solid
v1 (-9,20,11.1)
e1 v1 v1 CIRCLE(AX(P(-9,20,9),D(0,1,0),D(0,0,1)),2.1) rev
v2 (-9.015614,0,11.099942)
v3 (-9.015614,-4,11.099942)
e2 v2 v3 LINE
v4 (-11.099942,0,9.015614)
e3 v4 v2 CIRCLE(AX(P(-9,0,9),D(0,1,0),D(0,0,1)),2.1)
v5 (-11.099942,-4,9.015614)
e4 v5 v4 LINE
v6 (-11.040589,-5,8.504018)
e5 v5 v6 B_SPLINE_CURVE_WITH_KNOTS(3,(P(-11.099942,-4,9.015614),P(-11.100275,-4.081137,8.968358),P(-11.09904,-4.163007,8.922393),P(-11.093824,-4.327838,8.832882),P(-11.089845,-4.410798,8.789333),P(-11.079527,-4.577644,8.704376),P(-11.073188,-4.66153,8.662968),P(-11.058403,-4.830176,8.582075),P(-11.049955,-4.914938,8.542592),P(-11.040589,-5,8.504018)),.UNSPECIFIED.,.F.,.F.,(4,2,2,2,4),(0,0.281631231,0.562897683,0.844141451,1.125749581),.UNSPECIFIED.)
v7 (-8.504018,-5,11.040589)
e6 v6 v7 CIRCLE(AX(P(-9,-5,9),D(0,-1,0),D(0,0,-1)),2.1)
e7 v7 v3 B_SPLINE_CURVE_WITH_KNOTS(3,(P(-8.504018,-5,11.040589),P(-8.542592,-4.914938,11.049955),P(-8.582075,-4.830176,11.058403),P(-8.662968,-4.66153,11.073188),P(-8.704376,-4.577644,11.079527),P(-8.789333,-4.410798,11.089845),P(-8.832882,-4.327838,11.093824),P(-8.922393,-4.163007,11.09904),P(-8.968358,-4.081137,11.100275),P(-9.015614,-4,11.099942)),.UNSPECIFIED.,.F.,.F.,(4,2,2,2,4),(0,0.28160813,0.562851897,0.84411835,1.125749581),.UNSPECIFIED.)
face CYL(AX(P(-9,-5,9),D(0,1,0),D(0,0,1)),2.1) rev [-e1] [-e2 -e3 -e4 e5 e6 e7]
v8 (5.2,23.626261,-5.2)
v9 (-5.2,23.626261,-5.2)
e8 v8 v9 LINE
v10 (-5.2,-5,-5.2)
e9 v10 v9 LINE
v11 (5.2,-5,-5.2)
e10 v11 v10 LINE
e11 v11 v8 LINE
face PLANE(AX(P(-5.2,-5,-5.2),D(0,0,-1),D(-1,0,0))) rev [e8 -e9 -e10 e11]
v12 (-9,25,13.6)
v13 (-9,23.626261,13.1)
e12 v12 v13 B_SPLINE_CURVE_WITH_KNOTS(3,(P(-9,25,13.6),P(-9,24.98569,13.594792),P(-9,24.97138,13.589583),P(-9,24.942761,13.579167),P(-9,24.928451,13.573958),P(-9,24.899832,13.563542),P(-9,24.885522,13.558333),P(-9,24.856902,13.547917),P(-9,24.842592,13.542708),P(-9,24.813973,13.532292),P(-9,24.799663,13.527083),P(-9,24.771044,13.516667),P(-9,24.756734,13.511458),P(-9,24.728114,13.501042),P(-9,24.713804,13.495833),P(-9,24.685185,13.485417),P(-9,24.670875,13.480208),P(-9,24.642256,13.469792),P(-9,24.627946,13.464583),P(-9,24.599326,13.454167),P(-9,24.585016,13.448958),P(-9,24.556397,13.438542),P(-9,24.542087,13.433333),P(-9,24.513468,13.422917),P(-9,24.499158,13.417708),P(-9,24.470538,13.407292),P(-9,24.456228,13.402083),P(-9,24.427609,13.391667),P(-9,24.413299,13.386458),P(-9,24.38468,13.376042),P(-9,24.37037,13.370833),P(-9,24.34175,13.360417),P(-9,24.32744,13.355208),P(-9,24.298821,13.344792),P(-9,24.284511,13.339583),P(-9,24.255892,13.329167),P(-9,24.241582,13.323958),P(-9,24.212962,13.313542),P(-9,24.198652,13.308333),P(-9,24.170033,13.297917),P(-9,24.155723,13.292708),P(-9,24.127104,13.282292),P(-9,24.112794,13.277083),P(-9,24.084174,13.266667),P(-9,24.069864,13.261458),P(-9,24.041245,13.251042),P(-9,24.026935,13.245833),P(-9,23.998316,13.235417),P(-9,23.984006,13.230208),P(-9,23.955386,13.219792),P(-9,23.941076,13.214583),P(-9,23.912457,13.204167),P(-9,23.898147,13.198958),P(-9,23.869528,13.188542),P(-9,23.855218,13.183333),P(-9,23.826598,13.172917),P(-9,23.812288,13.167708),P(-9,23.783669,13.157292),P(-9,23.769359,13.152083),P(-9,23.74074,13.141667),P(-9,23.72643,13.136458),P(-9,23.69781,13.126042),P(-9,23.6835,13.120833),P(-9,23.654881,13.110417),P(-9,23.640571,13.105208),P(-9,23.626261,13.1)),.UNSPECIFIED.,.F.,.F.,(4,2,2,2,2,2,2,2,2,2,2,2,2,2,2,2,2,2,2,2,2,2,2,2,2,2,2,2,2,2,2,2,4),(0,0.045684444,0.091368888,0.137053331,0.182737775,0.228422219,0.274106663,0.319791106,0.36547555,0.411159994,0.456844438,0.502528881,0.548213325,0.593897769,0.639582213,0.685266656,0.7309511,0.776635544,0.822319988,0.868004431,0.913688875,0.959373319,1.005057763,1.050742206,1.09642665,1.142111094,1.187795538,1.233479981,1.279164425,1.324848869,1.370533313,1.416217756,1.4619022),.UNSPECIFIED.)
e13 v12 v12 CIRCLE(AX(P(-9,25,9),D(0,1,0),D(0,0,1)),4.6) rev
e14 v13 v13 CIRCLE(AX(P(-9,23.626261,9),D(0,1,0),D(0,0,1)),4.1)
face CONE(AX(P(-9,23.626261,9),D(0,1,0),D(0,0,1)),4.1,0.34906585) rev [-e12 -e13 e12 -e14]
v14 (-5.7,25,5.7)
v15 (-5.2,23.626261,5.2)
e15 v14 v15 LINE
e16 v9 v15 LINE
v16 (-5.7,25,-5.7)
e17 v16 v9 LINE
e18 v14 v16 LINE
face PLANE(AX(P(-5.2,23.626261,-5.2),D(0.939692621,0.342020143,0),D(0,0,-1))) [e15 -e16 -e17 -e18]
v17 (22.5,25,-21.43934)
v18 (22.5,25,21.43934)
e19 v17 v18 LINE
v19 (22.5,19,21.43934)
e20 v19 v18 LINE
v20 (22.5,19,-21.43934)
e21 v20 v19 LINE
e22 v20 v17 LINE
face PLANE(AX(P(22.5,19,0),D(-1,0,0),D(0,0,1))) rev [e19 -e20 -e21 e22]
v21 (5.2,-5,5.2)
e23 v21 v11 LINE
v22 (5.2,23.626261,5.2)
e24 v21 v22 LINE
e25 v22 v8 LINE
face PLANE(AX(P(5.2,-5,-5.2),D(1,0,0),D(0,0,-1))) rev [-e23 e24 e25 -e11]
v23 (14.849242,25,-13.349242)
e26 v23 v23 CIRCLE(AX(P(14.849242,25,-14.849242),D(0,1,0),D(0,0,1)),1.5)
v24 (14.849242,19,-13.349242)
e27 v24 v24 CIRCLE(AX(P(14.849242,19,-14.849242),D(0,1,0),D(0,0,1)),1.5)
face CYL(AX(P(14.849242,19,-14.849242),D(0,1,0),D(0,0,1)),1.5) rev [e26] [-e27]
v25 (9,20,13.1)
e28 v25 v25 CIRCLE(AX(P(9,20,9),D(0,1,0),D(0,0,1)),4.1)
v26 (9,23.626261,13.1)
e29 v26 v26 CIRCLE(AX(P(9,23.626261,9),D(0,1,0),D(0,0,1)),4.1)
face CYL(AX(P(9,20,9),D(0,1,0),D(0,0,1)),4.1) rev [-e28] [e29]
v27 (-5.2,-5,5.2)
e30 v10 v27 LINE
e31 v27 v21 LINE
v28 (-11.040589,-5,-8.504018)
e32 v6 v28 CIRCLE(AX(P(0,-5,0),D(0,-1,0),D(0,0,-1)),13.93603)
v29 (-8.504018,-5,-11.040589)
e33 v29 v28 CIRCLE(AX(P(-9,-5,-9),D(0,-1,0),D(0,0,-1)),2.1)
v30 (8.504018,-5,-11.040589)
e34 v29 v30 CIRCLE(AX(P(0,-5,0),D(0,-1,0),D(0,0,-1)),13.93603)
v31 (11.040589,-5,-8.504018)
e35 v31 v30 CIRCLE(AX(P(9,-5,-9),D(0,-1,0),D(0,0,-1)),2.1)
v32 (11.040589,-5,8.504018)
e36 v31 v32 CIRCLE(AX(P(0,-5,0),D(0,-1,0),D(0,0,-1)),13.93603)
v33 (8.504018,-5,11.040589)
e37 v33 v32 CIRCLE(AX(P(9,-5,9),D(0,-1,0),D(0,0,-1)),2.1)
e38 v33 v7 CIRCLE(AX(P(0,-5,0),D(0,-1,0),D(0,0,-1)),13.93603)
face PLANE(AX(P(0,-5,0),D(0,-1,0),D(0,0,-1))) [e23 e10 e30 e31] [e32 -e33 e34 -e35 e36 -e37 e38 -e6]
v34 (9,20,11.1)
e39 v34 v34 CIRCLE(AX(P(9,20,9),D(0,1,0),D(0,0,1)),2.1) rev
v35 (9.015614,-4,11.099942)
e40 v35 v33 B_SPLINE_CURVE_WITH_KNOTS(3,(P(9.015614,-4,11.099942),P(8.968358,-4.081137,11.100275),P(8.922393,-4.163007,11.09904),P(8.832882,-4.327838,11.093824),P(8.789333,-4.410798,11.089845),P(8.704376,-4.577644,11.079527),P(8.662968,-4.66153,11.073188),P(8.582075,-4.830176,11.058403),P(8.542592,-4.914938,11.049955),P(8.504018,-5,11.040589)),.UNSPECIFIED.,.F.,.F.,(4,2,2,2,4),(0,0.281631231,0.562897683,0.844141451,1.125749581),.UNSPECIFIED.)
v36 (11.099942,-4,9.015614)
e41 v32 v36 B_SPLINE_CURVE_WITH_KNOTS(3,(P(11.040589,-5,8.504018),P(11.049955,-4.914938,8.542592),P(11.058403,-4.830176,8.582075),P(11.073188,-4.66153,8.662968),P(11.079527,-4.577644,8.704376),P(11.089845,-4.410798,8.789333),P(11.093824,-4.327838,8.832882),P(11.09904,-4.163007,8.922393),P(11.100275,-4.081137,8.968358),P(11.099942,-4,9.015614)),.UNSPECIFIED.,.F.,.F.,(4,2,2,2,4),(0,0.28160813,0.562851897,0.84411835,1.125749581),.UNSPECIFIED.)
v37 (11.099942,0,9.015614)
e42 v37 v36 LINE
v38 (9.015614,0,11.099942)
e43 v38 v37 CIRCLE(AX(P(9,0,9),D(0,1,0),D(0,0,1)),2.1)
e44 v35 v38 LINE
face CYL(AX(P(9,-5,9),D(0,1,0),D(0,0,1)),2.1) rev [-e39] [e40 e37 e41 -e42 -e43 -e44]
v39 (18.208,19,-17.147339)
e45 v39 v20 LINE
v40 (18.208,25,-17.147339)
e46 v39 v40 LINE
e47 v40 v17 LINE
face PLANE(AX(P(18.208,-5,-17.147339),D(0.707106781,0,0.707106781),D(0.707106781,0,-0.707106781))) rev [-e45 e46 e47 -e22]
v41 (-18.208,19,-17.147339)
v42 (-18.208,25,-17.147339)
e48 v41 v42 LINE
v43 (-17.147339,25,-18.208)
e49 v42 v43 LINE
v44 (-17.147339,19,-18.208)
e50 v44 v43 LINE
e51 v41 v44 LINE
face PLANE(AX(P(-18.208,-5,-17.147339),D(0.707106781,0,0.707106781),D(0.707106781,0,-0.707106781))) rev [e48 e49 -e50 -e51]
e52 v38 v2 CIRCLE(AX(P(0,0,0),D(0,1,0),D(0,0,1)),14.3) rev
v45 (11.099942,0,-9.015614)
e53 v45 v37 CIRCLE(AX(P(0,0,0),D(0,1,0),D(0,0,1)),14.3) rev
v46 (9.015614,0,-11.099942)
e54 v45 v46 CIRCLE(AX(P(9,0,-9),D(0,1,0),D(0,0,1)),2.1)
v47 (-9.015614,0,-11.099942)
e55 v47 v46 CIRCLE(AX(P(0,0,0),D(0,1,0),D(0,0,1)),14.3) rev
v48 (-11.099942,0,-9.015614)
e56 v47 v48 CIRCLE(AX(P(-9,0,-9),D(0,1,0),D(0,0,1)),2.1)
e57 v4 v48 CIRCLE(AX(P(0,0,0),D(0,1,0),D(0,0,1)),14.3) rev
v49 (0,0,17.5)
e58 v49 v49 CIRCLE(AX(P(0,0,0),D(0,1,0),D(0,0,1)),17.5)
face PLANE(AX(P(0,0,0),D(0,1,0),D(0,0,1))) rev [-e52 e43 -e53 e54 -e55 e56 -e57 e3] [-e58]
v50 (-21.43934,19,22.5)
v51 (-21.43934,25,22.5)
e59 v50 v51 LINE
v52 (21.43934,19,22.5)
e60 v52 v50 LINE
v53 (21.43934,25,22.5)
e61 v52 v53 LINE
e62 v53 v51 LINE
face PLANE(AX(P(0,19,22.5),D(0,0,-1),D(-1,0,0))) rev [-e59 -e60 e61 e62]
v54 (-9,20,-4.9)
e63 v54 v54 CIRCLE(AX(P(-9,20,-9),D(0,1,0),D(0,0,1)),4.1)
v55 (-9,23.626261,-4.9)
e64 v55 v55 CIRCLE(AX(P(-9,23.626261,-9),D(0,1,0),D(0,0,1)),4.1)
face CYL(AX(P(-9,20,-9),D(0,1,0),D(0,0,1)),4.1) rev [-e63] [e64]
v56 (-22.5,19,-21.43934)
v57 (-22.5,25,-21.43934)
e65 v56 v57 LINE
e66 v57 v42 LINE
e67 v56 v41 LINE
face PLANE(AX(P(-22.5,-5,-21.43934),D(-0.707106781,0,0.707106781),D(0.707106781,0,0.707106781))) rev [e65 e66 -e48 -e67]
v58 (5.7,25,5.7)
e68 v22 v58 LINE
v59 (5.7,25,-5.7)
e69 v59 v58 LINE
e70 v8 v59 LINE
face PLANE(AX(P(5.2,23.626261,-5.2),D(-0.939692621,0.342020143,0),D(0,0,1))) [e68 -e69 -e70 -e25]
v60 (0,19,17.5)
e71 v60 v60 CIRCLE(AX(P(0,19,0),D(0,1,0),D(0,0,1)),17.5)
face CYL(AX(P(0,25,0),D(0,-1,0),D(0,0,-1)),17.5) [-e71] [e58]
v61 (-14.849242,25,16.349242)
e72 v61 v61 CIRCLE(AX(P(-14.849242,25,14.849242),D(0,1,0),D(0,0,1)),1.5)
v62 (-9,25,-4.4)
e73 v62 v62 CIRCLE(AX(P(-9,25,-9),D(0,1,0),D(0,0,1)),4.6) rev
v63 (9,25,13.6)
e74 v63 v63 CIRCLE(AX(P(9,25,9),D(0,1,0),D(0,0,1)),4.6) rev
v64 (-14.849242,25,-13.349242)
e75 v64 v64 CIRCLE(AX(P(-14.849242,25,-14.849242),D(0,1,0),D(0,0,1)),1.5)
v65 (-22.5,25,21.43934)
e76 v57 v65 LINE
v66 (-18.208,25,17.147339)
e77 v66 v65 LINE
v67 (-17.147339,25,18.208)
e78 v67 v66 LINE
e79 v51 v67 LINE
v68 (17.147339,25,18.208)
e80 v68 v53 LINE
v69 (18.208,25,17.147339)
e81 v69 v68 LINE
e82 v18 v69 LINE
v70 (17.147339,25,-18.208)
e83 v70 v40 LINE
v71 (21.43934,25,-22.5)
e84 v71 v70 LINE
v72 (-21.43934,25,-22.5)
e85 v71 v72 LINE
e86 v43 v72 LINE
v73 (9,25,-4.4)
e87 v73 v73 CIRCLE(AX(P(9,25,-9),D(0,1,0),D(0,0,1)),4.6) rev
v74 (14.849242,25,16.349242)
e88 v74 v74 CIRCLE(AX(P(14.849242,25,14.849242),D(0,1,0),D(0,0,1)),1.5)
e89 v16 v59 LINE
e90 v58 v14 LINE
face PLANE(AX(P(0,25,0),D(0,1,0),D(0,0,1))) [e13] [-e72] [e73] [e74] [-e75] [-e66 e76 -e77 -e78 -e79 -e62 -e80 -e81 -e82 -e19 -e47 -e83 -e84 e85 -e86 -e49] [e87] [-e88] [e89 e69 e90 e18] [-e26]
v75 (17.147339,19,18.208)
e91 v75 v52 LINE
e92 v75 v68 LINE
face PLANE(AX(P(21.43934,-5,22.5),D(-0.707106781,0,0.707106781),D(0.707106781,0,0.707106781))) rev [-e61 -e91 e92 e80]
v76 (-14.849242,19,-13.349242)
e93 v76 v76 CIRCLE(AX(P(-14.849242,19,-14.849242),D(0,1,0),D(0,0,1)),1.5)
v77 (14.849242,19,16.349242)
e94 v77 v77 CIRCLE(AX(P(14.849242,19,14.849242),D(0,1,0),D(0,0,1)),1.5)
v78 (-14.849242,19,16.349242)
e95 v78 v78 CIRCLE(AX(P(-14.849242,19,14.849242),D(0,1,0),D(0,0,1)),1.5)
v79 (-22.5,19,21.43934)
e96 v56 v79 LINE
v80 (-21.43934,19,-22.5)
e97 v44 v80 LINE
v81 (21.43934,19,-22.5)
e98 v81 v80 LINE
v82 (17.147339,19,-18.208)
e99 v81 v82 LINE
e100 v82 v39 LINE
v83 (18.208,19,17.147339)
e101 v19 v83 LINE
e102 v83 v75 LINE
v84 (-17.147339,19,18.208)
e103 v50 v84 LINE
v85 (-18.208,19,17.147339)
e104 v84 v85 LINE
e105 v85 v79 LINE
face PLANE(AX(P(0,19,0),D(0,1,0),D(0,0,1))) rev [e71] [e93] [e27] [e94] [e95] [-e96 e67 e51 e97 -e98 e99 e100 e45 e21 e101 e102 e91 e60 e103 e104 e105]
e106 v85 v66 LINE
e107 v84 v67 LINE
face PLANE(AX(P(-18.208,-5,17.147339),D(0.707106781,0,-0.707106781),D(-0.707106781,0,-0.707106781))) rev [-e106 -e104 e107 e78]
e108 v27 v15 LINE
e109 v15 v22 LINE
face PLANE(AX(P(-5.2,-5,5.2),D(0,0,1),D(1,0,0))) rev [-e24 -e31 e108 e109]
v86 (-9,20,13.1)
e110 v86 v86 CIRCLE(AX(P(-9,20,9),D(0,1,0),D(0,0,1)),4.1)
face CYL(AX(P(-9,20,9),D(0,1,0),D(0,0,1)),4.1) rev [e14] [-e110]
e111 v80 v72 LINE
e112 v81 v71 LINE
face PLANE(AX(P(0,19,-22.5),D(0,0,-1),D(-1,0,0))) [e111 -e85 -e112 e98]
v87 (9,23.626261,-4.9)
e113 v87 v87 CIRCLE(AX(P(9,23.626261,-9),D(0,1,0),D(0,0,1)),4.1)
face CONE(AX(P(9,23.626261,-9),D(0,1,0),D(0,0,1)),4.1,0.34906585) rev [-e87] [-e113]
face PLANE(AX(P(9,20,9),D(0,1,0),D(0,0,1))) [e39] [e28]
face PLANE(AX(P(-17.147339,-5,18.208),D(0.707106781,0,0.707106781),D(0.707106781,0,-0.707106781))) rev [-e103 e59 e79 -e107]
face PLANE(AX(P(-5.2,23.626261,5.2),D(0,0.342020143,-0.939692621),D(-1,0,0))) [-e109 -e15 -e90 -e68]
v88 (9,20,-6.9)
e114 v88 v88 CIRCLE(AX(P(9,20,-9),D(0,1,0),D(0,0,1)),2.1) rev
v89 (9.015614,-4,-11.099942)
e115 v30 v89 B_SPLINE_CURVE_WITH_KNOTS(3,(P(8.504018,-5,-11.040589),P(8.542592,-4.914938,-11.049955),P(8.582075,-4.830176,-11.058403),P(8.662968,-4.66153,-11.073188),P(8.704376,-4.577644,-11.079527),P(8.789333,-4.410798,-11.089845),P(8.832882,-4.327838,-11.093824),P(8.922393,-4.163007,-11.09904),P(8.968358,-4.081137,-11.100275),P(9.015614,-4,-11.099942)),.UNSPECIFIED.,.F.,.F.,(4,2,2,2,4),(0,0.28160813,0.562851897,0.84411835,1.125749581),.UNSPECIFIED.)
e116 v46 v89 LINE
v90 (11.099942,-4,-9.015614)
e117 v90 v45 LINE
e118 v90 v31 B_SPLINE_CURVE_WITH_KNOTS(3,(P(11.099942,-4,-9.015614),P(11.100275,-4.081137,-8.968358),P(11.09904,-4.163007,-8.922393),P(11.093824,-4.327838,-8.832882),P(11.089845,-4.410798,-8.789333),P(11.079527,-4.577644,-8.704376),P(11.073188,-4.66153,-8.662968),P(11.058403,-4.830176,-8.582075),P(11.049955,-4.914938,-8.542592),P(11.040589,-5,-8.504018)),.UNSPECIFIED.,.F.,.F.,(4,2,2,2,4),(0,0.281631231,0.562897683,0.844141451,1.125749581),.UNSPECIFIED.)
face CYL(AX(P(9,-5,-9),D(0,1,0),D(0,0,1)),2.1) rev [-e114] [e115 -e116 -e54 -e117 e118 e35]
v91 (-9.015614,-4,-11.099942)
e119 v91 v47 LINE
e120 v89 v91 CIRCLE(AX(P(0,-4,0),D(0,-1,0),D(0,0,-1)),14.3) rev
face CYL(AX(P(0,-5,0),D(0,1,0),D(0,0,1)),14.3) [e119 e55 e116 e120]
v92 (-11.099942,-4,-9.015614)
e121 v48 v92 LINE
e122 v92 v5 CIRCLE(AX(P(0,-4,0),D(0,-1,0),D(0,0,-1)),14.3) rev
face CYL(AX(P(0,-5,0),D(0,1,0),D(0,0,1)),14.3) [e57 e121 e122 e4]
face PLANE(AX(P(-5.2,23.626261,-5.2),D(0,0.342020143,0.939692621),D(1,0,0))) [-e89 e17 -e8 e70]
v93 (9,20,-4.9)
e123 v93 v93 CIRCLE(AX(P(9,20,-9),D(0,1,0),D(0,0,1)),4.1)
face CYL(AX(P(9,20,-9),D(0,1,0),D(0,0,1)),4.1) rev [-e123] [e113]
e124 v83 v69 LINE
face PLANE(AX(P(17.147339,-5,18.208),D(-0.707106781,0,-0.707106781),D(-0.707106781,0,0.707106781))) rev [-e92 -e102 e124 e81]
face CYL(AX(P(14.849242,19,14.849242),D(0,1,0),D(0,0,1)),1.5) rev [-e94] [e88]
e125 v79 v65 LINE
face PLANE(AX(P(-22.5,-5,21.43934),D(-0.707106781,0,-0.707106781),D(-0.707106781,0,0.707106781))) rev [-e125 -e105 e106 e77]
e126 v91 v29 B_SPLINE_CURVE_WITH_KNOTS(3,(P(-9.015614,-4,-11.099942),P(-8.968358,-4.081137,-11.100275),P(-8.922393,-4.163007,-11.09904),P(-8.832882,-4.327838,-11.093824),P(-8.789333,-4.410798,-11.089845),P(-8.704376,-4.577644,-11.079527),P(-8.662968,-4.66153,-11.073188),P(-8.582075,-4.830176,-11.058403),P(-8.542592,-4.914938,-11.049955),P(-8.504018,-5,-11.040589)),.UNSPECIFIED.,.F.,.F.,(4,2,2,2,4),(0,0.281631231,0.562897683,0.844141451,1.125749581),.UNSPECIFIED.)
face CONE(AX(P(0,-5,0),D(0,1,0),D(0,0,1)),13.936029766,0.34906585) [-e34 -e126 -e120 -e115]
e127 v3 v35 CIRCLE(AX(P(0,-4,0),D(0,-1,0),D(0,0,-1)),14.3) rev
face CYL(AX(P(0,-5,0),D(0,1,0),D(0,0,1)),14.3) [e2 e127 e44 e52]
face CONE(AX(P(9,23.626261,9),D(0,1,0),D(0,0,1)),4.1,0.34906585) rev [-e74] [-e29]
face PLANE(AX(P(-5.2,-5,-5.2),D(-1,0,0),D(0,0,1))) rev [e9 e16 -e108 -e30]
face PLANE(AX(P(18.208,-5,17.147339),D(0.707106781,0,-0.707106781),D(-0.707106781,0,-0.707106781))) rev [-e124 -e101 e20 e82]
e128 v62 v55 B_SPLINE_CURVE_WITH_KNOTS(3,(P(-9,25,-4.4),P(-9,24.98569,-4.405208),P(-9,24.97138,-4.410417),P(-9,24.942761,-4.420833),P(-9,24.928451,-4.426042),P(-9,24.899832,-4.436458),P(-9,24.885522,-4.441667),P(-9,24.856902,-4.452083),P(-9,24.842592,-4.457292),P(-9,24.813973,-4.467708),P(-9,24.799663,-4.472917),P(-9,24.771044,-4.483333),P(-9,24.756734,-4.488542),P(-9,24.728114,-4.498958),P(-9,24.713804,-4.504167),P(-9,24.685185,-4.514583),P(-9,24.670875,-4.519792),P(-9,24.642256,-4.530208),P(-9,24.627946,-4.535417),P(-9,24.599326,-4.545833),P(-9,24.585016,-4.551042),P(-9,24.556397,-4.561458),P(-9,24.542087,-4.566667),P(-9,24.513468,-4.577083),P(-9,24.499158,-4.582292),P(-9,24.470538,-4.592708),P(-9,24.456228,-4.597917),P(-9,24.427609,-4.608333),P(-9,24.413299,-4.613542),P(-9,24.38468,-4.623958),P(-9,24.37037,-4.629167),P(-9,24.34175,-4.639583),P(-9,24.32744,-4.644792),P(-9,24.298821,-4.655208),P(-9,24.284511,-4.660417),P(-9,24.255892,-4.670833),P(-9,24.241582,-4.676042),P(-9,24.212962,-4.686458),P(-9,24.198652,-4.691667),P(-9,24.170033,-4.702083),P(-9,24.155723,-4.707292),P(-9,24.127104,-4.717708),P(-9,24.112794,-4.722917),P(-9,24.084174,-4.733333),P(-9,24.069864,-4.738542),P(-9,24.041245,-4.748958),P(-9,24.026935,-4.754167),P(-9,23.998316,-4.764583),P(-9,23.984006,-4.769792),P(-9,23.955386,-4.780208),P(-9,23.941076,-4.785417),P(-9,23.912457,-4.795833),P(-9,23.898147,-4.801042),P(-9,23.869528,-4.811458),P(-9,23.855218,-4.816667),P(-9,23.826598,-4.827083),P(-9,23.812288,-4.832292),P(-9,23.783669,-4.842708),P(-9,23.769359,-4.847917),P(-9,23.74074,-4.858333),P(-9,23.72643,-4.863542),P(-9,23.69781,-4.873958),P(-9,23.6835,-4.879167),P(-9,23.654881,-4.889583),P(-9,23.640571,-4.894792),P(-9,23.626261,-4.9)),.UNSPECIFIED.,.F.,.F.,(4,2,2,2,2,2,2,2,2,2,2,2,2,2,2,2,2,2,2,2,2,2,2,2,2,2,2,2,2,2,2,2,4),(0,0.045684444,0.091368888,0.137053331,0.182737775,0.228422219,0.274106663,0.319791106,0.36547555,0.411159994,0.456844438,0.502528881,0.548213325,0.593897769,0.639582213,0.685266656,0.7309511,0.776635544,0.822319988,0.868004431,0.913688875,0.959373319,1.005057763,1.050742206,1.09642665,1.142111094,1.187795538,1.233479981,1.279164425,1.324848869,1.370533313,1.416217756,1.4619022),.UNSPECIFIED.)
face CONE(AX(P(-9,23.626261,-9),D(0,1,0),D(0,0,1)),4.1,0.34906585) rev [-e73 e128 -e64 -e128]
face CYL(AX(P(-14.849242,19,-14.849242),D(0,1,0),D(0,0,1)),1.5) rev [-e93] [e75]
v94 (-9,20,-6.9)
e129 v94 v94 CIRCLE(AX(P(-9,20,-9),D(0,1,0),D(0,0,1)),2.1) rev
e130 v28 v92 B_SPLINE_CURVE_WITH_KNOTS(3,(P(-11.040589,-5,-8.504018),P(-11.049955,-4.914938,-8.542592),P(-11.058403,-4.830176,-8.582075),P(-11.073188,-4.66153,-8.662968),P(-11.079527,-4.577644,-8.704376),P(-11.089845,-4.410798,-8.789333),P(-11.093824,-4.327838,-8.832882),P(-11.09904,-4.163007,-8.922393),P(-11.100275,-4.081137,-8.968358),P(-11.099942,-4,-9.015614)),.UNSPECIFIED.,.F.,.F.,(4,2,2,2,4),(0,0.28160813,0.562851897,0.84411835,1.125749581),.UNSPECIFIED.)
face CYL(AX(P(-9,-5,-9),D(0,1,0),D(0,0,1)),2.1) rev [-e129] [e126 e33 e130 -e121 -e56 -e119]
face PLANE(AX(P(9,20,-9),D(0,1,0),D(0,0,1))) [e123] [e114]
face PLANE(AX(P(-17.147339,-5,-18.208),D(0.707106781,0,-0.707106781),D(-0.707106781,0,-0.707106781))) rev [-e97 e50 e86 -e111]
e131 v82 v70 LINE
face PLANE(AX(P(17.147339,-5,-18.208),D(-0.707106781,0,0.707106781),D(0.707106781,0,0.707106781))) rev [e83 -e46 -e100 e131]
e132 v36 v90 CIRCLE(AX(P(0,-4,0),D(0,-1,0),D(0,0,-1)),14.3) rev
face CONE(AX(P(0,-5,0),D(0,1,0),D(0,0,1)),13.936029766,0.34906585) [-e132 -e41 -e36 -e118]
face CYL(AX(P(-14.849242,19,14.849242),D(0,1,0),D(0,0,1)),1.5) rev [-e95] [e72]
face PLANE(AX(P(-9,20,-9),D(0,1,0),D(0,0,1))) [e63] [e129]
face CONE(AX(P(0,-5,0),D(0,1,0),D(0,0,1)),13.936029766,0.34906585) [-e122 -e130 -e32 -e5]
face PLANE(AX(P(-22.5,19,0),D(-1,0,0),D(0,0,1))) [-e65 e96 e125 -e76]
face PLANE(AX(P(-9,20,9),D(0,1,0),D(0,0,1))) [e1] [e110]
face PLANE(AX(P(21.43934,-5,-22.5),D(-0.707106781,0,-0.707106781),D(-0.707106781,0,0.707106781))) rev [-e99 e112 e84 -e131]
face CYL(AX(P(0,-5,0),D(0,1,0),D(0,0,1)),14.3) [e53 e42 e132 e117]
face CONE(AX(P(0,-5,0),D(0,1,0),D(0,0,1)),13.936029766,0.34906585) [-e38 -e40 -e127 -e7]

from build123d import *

# Parameters (mm, degrees)
SKETCH1_R           = 17.5
BOSS_EXTRUDE1_DEPTH = 25
SKETCH3_R           = 14.3
BOSS_EXTRUDE2_DEPTH = 5
SKETCH4_W           = 10.4
SKETCH4_H           = 10.4
CUT_EXTRUDE1_DEPTH  = 39.890872965
SKETCH6_R           = 2.1
CUT_EXTRUDE2_DEPTH  = 39.890872965
CHAMFER1_SIZE       = 0.363970234
CHAMFER1_SIZE_2     = 1
SKETCH7_R           = 4.1
CUT_EXTRUDE3_DEPTH  = 5
CHAMFER2_SIZE       = 0.5
CHAMFER2_SIZE2      = 1.37373871
BOSS_EXTRUDE3_START = -6
SKETCH8_W           = 45
SKETCH8_H           = 45
SKETCH8_R           = 17.5
SKETCH8_R_2         = 1.5
BOSS_EXTRUDE3_DEPTH = 6
CUT_EXTRUDE4_DEPTH  = 44.73213928
CHAMFER3_SIZE       = 0.5
CHAMFER3_SIZE2      = 1.37373871


with BuildPart() as part:
    # Sketch1 → Boss-Extrude1 (new body)
    with BuildSketch(Plane(origin=(0, 0, 0), x_dir=(1, 0, 0), z_dir=(0, 1, 0))):
        with Locations(Location((0, 0, 0), (0, 0, 270))):
            Circle(SKETCH1_R)
    extrude(amount=BOSS_EXTRUDE1_DEPTH)

    # Sketch3 → Boss-Extrude2 (add)
    with BuildSketch(Plane.XZ):
        with Locations(Location((0, 0, 0), (0, 0, 90))):
            Circle(SKETCH3_R)
    extrude(amount=BOSS_EXTRUDE2_DEPTH)

    # Sketch4 → Cut-Extrude1 (cut, through all)
    with BuildSketch(Plane(origin=(0, 25, 0), x_dir=(1, 0, 0), z_dir=(0, 1, 0))):
        Rectangle(SKETCH4_W, SKETCH4_H)
    extrude(amount=-CUT_EXTRUDE1_DEPTH, mode=Mode.SUBTRACT)

    # Sketch6 → Cut-Extrude2 (cut, through all)
    with BuildSketch(Plane(origin=(0, 25, 0), x_dir=(1, 0, 0), z_dir=(0, 1, 0))):
        with Locations(Location((9, -9, 0), (0, 0, 270))):
            Circle(SKETCH6_R)
        with Locations(Location((-9, -9, 0), (0, 0, 270))):
            Circle(SKETCH6_R)
        with Locations(Location((-9, 9, 0), (0, 0, 270))):
            Circle(SKETCH6_R)
        with Locations(Location((9, 9, 0), (0, 0, 270))):
            Circle(SKETCH6_R)
    extrude(amount=-CUT_EXTRUDE2_DEPTH, mode=Mode.SUBTRACT)

    # Chamfer1
    # the kernel refuses this chamfer: 1, 0.363970234 mm, written as the material it takes off along each edge
    with BuildSketch(Plane(origin=(0, -5, 0), x_dir=(-0.7601968687413804, 0, 0.649692789521171), z_dir=(-0.649692789521171, 0, -0.7601968687413804))) as chamfer1_piece_1:
        Polygon((14.3 - CHAMFER1_SIZE, 0), (14.3, CHAMFER1_SIZE_2), (14.3, 0), align=None)
    revolve(axis=Axis((0, -5, 0), (0, 1, 0)), revolution_arc=98.963112953, mode=Mode.SUBTRACT)
    with BuildSketch(Plane(origin=(0, -5, 0), x_dir=(-0.6496927895211715, 0, 0.7601968687413799), z_dir=(0.7601968687413799, 0, 0.6496927895211715))) as chamfer1_piece_2:
        Polygon((14.3 - CHAMFER1_SIZE, 0), (14.3, -CHAMFER1_SIZE_2), (14.3, 0), align=None)
    revolve(axis=Axis((0, -5, 0), (0, -1, 0)), revolution_arc=98.963112953, mode=Mode.SUBTRACT)
    with BuildSketch(Plane(origin=(0, -5, 0), x_dir=(-0.7601968687413795, 0, -0.6496927895211719), z_dir=(-0.6496927895211719, 0, 0.7601968687413795))) as chamfer1_piece_3:
        Polygon((14.3, -CHAMFER1_SIZE_2), (14.3 - CHAMFER1_SIZE, 0), (14.3, 0), align=None)
    revolve(axis=Axis((0, -5, 0), (0, -1, 0)), revolution_arc=98.963112953, mode=Mode.SUBTRACT)
    with BuildSketch(Plane(origin=(0, -5, 0), x_dir=(0.6496927895211716, 0, -0.7601968687413798), z_dir=(-0.7601968687413798, 0, -0.6496927895211716))) as chamfer1_piece_4:
        Polygon((14.3, -CHAMFER1_SIZE_2), (14.3 - CHAMFER1_SIZE, 0), (14.3, 0), align=None)
    revolve(axis=Axis((0, -5, 0), (0, -1, 0)), revolution_arc=98.963112953, mode=Mode.SUBTRACT)

    # Sketch7 → Cut-Extrude3 (cut)
    with BuildSketch(Plane(origin=(0, 25, 0), x_dir=(1, 0, 0), z_dir=(0, 1, 0))):
        with Locations(Location((9, 9, 0), (0, 0, 270))):
            Circle(SKETCH7_R)
        with Locations(Location((-9, 9, 0), (0, 0, 270))):
            Circle(SKETCH7_R)
        with Locations(Location((-9, -9, 0), (0, 0, 270))):
            Circle(SKETCH7_R)
        with Locations(Location((9, -9, 0), (0, 0, 270))):
            Circle(SKETCH7_R)
    extrude(amount=-CUT_EXTRUDE3_DEPTH, mode=Mode.SUBTRACT)

    # Chamfer2
    chamfer2_edges = [part.edges().sort_by_distance(p)[0] for p in [
        (5.2, 25, 0),
        (0, 25, -5.2),
        (-5.2, 25, 0),
        (0, 25, 5.2),
    ]]
    chamfer2_side = [part.faces().sort_by_distance(p)[0] for p in [
        (0, 25, -17.005025253),
    ]]
    chamfer(chamfer2_edges, length=CHAMFER2_SIZE, length2=CHAMFER2_SIZE2, reference=chamfer2_side[0])

    # Sketch8 → Boss-Extrude3 (add)
    with BuildSketch(Plane(origin=(0, 25, 0), x_dir=(1, 0, 0), z_dir=(0, 1, 0)).offset(BOSS_EXTRUDE3_START)):
        Rectangle(SKETCH8_W, SKETCH8_H)
        with Locations(Location((0, 0, 0), (0, 0, 270))):
            Circle(SKETCH8_R, mode=Mode.SUBTRACT)
        with Locations(Location((-14.849242405, -14.849242405, 0), (0, 0, 270))):
            Circle(SKETCH8_R_2, mode=Mode.SUBTRACT)
        with Locations(Location((-14.849242405, 14.849242405, 0), (0, 0, 270))):
            Circle(SKETCH8_R_2, mode=Mode.SUBTRACT)
        with Locations(Location((14.849242405, 14.849242405, 0), (0, 0, 270))):
            Circle(SKETCH8_R_2, mode=Mode.SUBTRACT)
        with Locations(Location((14.849242405, -14.849242405, 0), (0, 0, 270))):
            Circle(SKETCH8_R_2, mode=Mode.SUBTRACT)
    extrude(amount=BOSS_EXTRUDE3_DEPTH)

    # Sketch10 → Cut-Extrude4 (cut, through all)
    with BuildSketch(Plane(origin=(0, 25, 0), x_dir=(1, 0, 0), z_dir=(0, 1, 0))):
        Polygon((-18.207999616, -17.147339444), (-17.147339444, -18.207999616), (-21.439339828, -22.5), (-22.5, -22.5), (-22.5, -21.439339828), align=None)
        Polygon((-22.5, 21.439339828), (-18.207999616, 17.147339444), (-17.147339444, 18.207999616), (-21.439339828, 22.5), (-22.5, 22.5), align=None)
        Polygon((21.439339828, 22.5), (17.147339444, 18.207999616), (18.207999616, 17.147339444), (22.5, 21.439339828), (22.5, 22.5), align=None)
        Polygon((17.147339444, -18.207999616), (18.207999616, -17.147339444), (22.5, -21.439339828), (22.5, -22.5), (21.439339828, -22.5), align=None)
    extrude(amount=-CUT_EXTRUDE4_DEPTH, mode=Mode.SUBTRACT)

    # Chamfer3
    chamfer3_edges = [part.edges().sort_by_distance(p)[0] for p in [
        (-9, 25, -13.1),
        (-9, 25, 4.9),
        (9, 25, 4.9),
        (9, 25, -13.1),
    ]]
    chamfer3_side = [part.faces().sort_by_distance(p)[0] for p in [
        (18.843339636, 25, -20.803999808),
    ]]
    chamfer(chamfer3_edges, length=CHAMFER3_SIZE, length2=CHAMFER3_SIZE2, reference=chamfer3_side[0])


solid = part.part
